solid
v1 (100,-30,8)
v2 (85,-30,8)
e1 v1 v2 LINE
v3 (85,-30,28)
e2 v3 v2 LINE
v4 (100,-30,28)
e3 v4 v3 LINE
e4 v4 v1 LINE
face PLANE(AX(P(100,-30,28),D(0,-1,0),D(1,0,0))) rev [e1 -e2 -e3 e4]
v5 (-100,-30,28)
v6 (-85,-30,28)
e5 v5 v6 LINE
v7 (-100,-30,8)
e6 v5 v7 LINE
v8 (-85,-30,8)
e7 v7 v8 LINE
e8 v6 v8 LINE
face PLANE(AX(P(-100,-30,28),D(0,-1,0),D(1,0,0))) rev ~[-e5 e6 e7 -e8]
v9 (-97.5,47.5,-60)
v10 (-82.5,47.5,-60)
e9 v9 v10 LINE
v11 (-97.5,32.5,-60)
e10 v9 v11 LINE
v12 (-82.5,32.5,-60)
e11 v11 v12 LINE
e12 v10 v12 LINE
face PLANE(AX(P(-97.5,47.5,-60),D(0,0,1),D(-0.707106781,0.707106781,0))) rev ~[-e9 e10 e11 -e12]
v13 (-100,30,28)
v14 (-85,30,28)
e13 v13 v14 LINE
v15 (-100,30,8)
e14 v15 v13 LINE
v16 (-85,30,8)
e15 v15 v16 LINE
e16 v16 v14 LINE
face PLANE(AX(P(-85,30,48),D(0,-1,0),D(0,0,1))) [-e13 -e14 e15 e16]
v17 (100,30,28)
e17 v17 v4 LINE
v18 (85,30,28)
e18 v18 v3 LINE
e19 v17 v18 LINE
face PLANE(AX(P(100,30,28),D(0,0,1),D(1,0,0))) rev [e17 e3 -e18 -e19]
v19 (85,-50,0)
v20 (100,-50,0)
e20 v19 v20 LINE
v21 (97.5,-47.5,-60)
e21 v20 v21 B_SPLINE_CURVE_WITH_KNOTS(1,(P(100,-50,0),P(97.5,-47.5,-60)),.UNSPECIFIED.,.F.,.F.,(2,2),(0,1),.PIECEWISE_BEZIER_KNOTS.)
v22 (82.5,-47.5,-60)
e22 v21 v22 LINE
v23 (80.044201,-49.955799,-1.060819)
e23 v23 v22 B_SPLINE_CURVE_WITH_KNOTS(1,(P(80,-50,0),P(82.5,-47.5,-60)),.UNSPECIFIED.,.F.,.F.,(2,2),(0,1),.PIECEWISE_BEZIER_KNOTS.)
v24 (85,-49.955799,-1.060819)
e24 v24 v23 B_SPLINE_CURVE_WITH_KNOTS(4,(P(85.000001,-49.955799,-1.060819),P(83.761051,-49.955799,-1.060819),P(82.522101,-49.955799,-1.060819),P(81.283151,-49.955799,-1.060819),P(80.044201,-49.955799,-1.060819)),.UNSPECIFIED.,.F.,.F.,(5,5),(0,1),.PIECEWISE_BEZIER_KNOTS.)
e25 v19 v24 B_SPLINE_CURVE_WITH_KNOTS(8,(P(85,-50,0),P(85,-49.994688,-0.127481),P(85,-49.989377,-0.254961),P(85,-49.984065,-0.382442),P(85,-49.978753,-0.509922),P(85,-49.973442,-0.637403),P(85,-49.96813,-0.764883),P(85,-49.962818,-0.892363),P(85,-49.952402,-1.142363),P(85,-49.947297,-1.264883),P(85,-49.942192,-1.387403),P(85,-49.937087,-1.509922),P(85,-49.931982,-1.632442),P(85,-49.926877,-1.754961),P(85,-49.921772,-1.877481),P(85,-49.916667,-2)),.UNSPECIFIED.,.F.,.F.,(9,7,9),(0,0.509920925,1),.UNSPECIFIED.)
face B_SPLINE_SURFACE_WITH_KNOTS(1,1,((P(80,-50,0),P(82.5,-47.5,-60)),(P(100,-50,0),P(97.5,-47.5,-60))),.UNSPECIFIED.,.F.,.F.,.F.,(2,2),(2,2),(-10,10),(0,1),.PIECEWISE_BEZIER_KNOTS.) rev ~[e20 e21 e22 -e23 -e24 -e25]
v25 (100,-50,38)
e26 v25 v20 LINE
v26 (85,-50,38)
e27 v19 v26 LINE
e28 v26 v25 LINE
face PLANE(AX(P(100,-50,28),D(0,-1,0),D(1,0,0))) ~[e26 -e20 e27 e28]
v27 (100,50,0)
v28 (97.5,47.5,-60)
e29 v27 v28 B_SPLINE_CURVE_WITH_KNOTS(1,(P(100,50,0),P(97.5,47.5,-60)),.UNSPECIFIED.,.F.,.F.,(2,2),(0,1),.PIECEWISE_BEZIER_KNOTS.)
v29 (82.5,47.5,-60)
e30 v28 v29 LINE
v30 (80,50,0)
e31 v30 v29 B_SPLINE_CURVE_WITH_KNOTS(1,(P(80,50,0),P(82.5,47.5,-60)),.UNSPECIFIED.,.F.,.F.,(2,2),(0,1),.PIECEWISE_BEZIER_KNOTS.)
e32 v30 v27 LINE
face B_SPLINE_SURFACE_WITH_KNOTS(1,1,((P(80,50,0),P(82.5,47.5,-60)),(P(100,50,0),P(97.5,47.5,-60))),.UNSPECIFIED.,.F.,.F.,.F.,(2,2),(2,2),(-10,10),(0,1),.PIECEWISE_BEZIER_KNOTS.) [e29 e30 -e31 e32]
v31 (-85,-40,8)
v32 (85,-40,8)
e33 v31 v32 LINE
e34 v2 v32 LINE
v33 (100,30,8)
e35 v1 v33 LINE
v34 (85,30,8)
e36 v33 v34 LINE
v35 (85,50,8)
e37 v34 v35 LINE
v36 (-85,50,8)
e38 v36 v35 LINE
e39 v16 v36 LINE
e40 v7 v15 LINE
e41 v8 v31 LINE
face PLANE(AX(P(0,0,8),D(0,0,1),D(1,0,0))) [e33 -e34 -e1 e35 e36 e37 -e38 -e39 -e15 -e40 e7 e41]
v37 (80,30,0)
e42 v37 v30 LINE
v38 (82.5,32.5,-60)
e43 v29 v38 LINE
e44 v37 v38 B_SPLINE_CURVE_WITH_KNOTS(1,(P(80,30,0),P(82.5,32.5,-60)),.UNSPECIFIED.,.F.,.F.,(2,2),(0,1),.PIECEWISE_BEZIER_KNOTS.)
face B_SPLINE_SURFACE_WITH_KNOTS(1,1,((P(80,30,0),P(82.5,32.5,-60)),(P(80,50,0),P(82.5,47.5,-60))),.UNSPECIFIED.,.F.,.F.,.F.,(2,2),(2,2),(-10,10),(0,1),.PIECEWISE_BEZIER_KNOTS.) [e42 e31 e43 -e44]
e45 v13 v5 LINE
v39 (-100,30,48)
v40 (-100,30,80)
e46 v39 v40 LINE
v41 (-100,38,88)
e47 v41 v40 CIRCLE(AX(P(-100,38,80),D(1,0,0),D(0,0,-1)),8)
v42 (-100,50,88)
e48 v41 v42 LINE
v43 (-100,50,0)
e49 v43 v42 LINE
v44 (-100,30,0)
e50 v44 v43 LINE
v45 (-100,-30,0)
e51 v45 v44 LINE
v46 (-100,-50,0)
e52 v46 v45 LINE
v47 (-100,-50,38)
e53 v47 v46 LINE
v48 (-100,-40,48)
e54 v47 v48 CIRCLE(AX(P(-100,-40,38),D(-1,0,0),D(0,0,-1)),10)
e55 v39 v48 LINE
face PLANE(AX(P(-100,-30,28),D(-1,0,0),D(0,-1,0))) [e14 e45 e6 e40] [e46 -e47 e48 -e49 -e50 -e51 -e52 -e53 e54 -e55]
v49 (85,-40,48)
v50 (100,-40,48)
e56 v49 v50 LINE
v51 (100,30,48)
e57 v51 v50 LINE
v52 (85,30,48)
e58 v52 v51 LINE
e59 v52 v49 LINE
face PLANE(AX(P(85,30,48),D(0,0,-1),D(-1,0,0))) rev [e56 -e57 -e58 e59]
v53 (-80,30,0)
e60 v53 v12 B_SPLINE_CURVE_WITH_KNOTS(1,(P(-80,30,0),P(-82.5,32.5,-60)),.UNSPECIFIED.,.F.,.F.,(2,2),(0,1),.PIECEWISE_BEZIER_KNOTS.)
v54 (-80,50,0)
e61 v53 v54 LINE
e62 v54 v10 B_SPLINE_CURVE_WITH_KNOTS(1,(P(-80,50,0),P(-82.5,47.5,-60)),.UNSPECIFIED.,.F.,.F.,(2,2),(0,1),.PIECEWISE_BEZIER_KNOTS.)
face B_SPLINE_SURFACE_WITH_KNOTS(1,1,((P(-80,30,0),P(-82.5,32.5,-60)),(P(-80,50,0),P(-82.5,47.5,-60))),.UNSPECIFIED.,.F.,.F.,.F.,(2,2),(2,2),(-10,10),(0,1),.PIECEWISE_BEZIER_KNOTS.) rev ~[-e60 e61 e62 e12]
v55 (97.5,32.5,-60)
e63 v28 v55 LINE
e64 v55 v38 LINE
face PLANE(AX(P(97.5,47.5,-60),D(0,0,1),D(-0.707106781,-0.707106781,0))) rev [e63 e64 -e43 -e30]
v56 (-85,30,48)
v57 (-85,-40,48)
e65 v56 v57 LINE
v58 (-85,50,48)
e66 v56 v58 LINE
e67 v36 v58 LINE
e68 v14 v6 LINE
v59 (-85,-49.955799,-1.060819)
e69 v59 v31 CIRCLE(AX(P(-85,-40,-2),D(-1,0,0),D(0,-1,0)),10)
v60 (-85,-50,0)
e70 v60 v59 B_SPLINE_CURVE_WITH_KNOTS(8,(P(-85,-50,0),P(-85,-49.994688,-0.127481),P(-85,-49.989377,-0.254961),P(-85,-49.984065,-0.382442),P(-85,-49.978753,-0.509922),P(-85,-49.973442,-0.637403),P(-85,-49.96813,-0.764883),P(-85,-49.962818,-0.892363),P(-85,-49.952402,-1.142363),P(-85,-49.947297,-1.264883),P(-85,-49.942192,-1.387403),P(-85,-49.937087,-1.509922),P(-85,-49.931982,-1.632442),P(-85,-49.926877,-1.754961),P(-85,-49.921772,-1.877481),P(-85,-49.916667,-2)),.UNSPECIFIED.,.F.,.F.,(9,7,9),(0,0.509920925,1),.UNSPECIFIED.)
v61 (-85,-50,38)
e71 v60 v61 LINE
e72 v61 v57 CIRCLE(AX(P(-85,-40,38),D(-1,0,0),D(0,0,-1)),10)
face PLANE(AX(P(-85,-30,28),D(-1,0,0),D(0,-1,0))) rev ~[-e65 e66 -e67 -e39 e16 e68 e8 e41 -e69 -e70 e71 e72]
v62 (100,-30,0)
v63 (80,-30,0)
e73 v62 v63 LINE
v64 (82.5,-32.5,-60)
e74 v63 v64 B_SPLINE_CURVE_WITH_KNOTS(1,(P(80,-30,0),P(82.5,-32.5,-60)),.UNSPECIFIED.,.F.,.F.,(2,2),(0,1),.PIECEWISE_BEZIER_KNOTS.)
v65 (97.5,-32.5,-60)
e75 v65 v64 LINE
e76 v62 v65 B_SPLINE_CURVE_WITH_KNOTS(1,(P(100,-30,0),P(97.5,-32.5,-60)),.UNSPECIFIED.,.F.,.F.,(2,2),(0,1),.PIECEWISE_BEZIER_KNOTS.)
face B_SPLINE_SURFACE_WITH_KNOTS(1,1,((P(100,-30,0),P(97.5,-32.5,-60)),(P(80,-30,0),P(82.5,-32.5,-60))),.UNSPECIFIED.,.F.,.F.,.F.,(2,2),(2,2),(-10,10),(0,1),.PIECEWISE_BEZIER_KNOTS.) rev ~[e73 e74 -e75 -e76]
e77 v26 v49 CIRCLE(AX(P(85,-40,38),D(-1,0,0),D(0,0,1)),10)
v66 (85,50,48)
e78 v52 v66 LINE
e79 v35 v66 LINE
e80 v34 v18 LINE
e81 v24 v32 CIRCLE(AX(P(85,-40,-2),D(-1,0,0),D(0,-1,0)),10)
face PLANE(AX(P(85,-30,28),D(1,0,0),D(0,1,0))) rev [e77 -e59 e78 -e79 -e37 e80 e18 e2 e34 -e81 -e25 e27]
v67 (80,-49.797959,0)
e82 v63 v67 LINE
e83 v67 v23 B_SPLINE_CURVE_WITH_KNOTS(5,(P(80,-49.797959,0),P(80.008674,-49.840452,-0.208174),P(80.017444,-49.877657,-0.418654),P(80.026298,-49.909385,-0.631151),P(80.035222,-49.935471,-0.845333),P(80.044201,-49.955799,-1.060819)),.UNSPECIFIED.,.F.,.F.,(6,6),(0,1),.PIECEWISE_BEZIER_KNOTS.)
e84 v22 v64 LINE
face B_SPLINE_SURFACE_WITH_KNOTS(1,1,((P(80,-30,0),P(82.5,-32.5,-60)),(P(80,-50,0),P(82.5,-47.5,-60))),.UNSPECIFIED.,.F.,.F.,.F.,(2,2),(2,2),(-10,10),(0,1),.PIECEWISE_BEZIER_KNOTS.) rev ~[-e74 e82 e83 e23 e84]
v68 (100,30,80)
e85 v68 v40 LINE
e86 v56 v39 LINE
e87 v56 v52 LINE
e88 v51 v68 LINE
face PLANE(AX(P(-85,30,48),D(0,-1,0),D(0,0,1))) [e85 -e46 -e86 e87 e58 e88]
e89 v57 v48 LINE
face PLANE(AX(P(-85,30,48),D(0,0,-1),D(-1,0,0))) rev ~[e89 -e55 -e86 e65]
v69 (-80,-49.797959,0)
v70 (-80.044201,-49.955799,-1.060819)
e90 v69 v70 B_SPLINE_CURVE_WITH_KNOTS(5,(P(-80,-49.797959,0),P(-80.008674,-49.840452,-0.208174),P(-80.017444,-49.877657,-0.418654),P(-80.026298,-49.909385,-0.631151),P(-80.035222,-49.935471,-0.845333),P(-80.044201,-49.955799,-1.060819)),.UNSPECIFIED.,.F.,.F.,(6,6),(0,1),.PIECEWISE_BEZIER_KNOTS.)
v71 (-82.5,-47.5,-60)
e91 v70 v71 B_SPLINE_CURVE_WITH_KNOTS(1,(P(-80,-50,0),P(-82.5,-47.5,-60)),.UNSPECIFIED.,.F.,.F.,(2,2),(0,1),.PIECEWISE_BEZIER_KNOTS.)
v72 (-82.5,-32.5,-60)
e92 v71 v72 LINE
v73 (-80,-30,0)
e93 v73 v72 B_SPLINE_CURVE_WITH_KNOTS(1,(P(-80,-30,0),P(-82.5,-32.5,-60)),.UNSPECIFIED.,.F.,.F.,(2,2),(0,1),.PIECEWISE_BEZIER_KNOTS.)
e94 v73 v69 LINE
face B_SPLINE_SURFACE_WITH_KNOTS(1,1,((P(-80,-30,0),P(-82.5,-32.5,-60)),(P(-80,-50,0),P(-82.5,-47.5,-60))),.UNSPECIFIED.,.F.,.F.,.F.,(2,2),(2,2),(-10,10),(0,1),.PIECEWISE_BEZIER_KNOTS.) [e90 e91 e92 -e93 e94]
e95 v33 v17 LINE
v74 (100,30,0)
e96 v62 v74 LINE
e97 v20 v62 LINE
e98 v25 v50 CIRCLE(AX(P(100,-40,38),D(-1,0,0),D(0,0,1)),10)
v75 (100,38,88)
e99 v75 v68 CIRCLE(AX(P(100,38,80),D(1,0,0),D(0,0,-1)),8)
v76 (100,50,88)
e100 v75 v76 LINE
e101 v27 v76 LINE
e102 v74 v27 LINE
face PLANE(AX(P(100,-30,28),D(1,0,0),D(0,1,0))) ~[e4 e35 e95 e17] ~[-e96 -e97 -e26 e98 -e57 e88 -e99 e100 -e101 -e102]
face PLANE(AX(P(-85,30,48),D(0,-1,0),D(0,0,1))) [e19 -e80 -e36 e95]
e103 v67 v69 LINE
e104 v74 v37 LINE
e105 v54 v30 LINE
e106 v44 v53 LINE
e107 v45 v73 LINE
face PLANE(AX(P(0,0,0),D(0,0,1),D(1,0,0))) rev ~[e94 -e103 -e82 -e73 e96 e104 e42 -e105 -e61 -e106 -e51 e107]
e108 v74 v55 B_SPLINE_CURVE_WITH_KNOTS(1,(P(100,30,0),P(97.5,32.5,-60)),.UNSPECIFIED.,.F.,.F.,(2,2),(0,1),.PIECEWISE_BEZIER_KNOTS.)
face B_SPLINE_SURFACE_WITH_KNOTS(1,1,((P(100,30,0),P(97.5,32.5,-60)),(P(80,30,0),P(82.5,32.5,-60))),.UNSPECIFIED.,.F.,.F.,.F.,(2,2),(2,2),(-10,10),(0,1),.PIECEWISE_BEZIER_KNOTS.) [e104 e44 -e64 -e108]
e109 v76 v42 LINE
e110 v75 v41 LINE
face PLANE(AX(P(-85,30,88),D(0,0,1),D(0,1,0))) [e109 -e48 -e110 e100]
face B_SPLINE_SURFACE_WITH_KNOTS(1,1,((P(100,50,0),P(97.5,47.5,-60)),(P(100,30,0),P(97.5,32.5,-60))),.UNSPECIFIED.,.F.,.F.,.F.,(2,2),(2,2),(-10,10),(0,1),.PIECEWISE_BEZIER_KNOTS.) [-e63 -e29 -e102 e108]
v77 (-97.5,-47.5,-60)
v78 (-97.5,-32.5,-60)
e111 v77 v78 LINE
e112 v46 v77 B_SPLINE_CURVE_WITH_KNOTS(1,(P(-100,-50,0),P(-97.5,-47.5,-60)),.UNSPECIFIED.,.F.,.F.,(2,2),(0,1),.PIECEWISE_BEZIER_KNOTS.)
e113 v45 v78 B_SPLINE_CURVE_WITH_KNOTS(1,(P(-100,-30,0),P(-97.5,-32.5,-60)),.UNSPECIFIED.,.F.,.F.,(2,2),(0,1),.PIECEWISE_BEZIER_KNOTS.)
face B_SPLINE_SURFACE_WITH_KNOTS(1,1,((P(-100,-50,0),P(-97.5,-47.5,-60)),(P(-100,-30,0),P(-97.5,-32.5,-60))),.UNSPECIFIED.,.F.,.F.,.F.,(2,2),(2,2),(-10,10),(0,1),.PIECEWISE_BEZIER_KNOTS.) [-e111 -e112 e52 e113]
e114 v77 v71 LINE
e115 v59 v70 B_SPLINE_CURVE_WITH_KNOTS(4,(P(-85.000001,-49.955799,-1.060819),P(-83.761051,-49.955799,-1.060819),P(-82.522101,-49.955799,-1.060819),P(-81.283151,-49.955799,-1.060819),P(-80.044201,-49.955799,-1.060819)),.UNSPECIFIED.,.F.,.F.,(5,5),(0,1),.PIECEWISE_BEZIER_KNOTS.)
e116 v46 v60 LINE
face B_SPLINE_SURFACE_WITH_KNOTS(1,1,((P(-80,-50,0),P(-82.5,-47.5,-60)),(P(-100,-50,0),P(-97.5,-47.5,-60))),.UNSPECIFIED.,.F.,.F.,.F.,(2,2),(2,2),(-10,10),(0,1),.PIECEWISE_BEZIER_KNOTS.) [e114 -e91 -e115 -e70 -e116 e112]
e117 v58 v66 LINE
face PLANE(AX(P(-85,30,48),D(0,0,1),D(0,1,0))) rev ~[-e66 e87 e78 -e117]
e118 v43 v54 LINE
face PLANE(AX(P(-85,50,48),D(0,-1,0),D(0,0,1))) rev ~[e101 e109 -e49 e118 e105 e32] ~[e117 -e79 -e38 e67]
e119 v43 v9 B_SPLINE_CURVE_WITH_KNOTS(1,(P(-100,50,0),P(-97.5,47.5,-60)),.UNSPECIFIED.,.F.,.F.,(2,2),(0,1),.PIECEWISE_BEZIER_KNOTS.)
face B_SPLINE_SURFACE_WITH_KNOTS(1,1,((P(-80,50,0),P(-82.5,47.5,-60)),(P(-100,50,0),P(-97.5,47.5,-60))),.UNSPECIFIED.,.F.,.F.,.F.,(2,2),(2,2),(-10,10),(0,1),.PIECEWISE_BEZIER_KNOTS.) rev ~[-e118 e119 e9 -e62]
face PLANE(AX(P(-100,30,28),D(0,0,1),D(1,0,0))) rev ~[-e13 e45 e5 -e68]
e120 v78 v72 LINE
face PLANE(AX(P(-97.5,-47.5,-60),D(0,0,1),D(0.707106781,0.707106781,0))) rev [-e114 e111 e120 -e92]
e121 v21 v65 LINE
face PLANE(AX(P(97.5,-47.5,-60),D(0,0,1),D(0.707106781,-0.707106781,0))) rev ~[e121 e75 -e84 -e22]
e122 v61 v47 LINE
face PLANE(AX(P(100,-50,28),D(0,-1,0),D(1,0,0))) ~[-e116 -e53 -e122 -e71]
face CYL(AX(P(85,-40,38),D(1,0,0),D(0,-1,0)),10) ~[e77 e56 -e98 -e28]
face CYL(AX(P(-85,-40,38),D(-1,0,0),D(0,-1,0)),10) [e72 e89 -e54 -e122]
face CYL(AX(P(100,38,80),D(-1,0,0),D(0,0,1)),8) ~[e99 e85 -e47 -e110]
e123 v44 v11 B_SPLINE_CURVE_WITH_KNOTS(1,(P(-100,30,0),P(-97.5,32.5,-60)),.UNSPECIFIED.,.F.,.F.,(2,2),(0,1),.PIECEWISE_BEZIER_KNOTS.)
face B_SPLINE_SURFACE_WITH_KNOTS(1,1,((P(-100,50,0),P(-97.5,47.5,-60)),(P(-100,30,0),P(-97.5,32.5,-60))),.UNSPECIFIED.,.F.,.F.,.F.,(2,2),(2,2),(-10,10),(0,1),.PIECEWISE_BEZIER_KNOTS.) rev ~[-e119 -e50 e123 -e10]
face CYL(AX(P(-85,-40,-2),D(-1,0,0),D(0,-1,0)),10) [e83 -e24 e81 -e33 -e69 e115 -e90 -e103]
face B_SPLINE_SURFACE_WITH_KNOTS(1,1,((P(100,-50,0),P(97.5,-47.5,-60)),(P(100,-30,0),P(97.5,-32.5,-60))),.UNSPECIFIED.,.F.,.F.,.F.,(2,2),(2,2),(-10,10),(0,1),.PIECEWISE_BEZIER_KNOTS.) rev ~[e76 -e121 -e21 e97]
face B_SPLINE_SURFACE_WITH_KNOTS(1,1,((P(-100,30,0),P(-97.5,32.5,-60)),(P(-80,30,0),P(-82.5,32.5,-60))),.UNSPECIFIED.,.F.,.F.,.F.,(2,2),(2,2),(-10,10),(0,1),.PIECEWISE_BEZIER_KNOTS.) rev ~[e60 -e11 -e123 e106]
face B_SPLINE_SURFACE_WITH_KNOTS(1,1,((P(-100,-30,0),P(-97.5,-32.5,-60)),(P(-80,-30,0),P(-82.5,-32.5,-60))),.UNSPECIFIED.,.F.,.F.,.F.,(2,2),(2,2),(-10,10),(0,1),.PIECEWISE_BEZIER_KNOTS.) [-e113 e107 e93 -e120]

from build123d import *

# Parameters (mm, degrees)
F0_W         = 200
F0_H         = 100
F1_DEPTH     = 8
F2_W         = 20
F2_H         = 20
F4_W         = 15
F4_H         = 15
F8_W         = 15
F8_H         = 20
F9_DEPTH     = 80
F11_W        = 20
F11_H        = 40
F12_DEPTH    = 170
F14_DEPTH    = 80
F15_W        = 15
F15_H        = 20
F16_DEPTH    = 20
F18_R        = 10
F19_R        = 10
F20_T1_DEPTH = 170
F21_R        = 8


# Not quite as in the source:
# - a fillet or chamfer that OpenCascade refuses, or shapes differently, is made with other operations: its cross-section is extruded or revolved along the edge and cut away or added


with BuildPart() as f1:
    # F0 (on Top) → F1 (new body)
    with BuildSketch(Plane.XY):
        Rectangle(F0_W, F0_H)
    extrude(amount=F1_DEPTH)

    # F2 (on face) → F5 section 0
    with BuildSketch(Plane(origin=(0, 0, 0), x_dir=(1, 0, 0), z_dir=(0, 0, -1))):
        with Locations((-90, 40)):
            Rectangle(F2_W, F2_H)
    # F4 (on offset) → F5 section 1
    with BuildSketch(Plane.XY.offset(-60)):
        with Locations((-90, -40)):
            Rectangle(F4_W, F4_H)
    loft()

    # F6: F1 across plane


with BuildPart() as f1_1:
    add(f1.part)
    add(f1.part.mirror(Plane.XZ))

    # F7: F1 across plane


with BuildPart() as f1_2:
    add(f1_1.part)
    add(f1_1.part.mirror(Plane.YZ))

    # F8 (on face) → F9 (join)
    with BuildSketch(Plane.XY.offset(8)):
        with Locations((-92.5, 40)):
            Rectangle(F8_W, F8_H)
    extrude(amount=F9_DEPTH)

    # F10: F1 across plane


with BuildPart() as f1_3:
    add(f1_2.part)
    add(f1_2.part.mirror(Plane.YZ))

    # F11 (on face) → F12 (join)
    with BuildSketch(Plane.YZ.offset(-85)):
        with Locations((40, 68)):
            Rectangle(F11_W, F11_H)
    extrude(amount=F12_DEPTH)

    # F13 (on face) → F14 (join)
    with BuildSketch(Plane.XZ.offset(-30)):
        Polygon((-85, 28), (-85, 48), (-92.5, 48), (-100, 48), (-100, 28), align=None)
    extrude(amount=F14_DEPTH)

    # F15 (on face) → F16 (join)
    with BuildSketch(Plane(origin=(0, 0, 28), x_dir=(1, 0, 0), z_dir=(0, 0, -1))):
        with Locations((-92.5, 40)):
            Rectangle(F15_W, F15_H)
    extrude(amount=F16_DEPTH)

    # F17: F1 across plane


with BuildPart() as f1_4:
    add(f1_3.part)
    add(f1_3.part.mirror(Plane.YZ))

    # F18
    f18_edges = [f1_4.edges().sort_by_distance(p)[0] for p in [
        (92.5, -50, 48),
    ]]
    fillet(f18_edges, radius=F18_R)

    # F19
    f19_edges = [f1_4.edges().sort_by_distance(p)[0] for p in [
        (-92.5, -50, 48),
    ]]
    fillet(f19_edges, radius=F19_R)

    # F20: fillet of radius 10 on 1 edges, made by hand

    # F20_s2 → F20_t1 (cut)
    with BuildSketch(Plane.YZ.offset(-85)):
        with BuildLine():
            ThreePointArc((-50, -2), (-47.0710678119, 5.0710678119), (-40, 8))
            Line((-40, 8), (-50, 8))
            Line((-50, 8), (-50, -2))
        make_face()
    extrude(amount=F20_T1_DEPTH, mode=Mode.SUBTRACT)

    # F21
    f21_edges = [f1_4.edges().sort_by_distance(p)[0] for p in [
        (0, 30, 88),
    ]]
    fillet(f21_edges, radius=F21_R)


solid = f1_4.part
